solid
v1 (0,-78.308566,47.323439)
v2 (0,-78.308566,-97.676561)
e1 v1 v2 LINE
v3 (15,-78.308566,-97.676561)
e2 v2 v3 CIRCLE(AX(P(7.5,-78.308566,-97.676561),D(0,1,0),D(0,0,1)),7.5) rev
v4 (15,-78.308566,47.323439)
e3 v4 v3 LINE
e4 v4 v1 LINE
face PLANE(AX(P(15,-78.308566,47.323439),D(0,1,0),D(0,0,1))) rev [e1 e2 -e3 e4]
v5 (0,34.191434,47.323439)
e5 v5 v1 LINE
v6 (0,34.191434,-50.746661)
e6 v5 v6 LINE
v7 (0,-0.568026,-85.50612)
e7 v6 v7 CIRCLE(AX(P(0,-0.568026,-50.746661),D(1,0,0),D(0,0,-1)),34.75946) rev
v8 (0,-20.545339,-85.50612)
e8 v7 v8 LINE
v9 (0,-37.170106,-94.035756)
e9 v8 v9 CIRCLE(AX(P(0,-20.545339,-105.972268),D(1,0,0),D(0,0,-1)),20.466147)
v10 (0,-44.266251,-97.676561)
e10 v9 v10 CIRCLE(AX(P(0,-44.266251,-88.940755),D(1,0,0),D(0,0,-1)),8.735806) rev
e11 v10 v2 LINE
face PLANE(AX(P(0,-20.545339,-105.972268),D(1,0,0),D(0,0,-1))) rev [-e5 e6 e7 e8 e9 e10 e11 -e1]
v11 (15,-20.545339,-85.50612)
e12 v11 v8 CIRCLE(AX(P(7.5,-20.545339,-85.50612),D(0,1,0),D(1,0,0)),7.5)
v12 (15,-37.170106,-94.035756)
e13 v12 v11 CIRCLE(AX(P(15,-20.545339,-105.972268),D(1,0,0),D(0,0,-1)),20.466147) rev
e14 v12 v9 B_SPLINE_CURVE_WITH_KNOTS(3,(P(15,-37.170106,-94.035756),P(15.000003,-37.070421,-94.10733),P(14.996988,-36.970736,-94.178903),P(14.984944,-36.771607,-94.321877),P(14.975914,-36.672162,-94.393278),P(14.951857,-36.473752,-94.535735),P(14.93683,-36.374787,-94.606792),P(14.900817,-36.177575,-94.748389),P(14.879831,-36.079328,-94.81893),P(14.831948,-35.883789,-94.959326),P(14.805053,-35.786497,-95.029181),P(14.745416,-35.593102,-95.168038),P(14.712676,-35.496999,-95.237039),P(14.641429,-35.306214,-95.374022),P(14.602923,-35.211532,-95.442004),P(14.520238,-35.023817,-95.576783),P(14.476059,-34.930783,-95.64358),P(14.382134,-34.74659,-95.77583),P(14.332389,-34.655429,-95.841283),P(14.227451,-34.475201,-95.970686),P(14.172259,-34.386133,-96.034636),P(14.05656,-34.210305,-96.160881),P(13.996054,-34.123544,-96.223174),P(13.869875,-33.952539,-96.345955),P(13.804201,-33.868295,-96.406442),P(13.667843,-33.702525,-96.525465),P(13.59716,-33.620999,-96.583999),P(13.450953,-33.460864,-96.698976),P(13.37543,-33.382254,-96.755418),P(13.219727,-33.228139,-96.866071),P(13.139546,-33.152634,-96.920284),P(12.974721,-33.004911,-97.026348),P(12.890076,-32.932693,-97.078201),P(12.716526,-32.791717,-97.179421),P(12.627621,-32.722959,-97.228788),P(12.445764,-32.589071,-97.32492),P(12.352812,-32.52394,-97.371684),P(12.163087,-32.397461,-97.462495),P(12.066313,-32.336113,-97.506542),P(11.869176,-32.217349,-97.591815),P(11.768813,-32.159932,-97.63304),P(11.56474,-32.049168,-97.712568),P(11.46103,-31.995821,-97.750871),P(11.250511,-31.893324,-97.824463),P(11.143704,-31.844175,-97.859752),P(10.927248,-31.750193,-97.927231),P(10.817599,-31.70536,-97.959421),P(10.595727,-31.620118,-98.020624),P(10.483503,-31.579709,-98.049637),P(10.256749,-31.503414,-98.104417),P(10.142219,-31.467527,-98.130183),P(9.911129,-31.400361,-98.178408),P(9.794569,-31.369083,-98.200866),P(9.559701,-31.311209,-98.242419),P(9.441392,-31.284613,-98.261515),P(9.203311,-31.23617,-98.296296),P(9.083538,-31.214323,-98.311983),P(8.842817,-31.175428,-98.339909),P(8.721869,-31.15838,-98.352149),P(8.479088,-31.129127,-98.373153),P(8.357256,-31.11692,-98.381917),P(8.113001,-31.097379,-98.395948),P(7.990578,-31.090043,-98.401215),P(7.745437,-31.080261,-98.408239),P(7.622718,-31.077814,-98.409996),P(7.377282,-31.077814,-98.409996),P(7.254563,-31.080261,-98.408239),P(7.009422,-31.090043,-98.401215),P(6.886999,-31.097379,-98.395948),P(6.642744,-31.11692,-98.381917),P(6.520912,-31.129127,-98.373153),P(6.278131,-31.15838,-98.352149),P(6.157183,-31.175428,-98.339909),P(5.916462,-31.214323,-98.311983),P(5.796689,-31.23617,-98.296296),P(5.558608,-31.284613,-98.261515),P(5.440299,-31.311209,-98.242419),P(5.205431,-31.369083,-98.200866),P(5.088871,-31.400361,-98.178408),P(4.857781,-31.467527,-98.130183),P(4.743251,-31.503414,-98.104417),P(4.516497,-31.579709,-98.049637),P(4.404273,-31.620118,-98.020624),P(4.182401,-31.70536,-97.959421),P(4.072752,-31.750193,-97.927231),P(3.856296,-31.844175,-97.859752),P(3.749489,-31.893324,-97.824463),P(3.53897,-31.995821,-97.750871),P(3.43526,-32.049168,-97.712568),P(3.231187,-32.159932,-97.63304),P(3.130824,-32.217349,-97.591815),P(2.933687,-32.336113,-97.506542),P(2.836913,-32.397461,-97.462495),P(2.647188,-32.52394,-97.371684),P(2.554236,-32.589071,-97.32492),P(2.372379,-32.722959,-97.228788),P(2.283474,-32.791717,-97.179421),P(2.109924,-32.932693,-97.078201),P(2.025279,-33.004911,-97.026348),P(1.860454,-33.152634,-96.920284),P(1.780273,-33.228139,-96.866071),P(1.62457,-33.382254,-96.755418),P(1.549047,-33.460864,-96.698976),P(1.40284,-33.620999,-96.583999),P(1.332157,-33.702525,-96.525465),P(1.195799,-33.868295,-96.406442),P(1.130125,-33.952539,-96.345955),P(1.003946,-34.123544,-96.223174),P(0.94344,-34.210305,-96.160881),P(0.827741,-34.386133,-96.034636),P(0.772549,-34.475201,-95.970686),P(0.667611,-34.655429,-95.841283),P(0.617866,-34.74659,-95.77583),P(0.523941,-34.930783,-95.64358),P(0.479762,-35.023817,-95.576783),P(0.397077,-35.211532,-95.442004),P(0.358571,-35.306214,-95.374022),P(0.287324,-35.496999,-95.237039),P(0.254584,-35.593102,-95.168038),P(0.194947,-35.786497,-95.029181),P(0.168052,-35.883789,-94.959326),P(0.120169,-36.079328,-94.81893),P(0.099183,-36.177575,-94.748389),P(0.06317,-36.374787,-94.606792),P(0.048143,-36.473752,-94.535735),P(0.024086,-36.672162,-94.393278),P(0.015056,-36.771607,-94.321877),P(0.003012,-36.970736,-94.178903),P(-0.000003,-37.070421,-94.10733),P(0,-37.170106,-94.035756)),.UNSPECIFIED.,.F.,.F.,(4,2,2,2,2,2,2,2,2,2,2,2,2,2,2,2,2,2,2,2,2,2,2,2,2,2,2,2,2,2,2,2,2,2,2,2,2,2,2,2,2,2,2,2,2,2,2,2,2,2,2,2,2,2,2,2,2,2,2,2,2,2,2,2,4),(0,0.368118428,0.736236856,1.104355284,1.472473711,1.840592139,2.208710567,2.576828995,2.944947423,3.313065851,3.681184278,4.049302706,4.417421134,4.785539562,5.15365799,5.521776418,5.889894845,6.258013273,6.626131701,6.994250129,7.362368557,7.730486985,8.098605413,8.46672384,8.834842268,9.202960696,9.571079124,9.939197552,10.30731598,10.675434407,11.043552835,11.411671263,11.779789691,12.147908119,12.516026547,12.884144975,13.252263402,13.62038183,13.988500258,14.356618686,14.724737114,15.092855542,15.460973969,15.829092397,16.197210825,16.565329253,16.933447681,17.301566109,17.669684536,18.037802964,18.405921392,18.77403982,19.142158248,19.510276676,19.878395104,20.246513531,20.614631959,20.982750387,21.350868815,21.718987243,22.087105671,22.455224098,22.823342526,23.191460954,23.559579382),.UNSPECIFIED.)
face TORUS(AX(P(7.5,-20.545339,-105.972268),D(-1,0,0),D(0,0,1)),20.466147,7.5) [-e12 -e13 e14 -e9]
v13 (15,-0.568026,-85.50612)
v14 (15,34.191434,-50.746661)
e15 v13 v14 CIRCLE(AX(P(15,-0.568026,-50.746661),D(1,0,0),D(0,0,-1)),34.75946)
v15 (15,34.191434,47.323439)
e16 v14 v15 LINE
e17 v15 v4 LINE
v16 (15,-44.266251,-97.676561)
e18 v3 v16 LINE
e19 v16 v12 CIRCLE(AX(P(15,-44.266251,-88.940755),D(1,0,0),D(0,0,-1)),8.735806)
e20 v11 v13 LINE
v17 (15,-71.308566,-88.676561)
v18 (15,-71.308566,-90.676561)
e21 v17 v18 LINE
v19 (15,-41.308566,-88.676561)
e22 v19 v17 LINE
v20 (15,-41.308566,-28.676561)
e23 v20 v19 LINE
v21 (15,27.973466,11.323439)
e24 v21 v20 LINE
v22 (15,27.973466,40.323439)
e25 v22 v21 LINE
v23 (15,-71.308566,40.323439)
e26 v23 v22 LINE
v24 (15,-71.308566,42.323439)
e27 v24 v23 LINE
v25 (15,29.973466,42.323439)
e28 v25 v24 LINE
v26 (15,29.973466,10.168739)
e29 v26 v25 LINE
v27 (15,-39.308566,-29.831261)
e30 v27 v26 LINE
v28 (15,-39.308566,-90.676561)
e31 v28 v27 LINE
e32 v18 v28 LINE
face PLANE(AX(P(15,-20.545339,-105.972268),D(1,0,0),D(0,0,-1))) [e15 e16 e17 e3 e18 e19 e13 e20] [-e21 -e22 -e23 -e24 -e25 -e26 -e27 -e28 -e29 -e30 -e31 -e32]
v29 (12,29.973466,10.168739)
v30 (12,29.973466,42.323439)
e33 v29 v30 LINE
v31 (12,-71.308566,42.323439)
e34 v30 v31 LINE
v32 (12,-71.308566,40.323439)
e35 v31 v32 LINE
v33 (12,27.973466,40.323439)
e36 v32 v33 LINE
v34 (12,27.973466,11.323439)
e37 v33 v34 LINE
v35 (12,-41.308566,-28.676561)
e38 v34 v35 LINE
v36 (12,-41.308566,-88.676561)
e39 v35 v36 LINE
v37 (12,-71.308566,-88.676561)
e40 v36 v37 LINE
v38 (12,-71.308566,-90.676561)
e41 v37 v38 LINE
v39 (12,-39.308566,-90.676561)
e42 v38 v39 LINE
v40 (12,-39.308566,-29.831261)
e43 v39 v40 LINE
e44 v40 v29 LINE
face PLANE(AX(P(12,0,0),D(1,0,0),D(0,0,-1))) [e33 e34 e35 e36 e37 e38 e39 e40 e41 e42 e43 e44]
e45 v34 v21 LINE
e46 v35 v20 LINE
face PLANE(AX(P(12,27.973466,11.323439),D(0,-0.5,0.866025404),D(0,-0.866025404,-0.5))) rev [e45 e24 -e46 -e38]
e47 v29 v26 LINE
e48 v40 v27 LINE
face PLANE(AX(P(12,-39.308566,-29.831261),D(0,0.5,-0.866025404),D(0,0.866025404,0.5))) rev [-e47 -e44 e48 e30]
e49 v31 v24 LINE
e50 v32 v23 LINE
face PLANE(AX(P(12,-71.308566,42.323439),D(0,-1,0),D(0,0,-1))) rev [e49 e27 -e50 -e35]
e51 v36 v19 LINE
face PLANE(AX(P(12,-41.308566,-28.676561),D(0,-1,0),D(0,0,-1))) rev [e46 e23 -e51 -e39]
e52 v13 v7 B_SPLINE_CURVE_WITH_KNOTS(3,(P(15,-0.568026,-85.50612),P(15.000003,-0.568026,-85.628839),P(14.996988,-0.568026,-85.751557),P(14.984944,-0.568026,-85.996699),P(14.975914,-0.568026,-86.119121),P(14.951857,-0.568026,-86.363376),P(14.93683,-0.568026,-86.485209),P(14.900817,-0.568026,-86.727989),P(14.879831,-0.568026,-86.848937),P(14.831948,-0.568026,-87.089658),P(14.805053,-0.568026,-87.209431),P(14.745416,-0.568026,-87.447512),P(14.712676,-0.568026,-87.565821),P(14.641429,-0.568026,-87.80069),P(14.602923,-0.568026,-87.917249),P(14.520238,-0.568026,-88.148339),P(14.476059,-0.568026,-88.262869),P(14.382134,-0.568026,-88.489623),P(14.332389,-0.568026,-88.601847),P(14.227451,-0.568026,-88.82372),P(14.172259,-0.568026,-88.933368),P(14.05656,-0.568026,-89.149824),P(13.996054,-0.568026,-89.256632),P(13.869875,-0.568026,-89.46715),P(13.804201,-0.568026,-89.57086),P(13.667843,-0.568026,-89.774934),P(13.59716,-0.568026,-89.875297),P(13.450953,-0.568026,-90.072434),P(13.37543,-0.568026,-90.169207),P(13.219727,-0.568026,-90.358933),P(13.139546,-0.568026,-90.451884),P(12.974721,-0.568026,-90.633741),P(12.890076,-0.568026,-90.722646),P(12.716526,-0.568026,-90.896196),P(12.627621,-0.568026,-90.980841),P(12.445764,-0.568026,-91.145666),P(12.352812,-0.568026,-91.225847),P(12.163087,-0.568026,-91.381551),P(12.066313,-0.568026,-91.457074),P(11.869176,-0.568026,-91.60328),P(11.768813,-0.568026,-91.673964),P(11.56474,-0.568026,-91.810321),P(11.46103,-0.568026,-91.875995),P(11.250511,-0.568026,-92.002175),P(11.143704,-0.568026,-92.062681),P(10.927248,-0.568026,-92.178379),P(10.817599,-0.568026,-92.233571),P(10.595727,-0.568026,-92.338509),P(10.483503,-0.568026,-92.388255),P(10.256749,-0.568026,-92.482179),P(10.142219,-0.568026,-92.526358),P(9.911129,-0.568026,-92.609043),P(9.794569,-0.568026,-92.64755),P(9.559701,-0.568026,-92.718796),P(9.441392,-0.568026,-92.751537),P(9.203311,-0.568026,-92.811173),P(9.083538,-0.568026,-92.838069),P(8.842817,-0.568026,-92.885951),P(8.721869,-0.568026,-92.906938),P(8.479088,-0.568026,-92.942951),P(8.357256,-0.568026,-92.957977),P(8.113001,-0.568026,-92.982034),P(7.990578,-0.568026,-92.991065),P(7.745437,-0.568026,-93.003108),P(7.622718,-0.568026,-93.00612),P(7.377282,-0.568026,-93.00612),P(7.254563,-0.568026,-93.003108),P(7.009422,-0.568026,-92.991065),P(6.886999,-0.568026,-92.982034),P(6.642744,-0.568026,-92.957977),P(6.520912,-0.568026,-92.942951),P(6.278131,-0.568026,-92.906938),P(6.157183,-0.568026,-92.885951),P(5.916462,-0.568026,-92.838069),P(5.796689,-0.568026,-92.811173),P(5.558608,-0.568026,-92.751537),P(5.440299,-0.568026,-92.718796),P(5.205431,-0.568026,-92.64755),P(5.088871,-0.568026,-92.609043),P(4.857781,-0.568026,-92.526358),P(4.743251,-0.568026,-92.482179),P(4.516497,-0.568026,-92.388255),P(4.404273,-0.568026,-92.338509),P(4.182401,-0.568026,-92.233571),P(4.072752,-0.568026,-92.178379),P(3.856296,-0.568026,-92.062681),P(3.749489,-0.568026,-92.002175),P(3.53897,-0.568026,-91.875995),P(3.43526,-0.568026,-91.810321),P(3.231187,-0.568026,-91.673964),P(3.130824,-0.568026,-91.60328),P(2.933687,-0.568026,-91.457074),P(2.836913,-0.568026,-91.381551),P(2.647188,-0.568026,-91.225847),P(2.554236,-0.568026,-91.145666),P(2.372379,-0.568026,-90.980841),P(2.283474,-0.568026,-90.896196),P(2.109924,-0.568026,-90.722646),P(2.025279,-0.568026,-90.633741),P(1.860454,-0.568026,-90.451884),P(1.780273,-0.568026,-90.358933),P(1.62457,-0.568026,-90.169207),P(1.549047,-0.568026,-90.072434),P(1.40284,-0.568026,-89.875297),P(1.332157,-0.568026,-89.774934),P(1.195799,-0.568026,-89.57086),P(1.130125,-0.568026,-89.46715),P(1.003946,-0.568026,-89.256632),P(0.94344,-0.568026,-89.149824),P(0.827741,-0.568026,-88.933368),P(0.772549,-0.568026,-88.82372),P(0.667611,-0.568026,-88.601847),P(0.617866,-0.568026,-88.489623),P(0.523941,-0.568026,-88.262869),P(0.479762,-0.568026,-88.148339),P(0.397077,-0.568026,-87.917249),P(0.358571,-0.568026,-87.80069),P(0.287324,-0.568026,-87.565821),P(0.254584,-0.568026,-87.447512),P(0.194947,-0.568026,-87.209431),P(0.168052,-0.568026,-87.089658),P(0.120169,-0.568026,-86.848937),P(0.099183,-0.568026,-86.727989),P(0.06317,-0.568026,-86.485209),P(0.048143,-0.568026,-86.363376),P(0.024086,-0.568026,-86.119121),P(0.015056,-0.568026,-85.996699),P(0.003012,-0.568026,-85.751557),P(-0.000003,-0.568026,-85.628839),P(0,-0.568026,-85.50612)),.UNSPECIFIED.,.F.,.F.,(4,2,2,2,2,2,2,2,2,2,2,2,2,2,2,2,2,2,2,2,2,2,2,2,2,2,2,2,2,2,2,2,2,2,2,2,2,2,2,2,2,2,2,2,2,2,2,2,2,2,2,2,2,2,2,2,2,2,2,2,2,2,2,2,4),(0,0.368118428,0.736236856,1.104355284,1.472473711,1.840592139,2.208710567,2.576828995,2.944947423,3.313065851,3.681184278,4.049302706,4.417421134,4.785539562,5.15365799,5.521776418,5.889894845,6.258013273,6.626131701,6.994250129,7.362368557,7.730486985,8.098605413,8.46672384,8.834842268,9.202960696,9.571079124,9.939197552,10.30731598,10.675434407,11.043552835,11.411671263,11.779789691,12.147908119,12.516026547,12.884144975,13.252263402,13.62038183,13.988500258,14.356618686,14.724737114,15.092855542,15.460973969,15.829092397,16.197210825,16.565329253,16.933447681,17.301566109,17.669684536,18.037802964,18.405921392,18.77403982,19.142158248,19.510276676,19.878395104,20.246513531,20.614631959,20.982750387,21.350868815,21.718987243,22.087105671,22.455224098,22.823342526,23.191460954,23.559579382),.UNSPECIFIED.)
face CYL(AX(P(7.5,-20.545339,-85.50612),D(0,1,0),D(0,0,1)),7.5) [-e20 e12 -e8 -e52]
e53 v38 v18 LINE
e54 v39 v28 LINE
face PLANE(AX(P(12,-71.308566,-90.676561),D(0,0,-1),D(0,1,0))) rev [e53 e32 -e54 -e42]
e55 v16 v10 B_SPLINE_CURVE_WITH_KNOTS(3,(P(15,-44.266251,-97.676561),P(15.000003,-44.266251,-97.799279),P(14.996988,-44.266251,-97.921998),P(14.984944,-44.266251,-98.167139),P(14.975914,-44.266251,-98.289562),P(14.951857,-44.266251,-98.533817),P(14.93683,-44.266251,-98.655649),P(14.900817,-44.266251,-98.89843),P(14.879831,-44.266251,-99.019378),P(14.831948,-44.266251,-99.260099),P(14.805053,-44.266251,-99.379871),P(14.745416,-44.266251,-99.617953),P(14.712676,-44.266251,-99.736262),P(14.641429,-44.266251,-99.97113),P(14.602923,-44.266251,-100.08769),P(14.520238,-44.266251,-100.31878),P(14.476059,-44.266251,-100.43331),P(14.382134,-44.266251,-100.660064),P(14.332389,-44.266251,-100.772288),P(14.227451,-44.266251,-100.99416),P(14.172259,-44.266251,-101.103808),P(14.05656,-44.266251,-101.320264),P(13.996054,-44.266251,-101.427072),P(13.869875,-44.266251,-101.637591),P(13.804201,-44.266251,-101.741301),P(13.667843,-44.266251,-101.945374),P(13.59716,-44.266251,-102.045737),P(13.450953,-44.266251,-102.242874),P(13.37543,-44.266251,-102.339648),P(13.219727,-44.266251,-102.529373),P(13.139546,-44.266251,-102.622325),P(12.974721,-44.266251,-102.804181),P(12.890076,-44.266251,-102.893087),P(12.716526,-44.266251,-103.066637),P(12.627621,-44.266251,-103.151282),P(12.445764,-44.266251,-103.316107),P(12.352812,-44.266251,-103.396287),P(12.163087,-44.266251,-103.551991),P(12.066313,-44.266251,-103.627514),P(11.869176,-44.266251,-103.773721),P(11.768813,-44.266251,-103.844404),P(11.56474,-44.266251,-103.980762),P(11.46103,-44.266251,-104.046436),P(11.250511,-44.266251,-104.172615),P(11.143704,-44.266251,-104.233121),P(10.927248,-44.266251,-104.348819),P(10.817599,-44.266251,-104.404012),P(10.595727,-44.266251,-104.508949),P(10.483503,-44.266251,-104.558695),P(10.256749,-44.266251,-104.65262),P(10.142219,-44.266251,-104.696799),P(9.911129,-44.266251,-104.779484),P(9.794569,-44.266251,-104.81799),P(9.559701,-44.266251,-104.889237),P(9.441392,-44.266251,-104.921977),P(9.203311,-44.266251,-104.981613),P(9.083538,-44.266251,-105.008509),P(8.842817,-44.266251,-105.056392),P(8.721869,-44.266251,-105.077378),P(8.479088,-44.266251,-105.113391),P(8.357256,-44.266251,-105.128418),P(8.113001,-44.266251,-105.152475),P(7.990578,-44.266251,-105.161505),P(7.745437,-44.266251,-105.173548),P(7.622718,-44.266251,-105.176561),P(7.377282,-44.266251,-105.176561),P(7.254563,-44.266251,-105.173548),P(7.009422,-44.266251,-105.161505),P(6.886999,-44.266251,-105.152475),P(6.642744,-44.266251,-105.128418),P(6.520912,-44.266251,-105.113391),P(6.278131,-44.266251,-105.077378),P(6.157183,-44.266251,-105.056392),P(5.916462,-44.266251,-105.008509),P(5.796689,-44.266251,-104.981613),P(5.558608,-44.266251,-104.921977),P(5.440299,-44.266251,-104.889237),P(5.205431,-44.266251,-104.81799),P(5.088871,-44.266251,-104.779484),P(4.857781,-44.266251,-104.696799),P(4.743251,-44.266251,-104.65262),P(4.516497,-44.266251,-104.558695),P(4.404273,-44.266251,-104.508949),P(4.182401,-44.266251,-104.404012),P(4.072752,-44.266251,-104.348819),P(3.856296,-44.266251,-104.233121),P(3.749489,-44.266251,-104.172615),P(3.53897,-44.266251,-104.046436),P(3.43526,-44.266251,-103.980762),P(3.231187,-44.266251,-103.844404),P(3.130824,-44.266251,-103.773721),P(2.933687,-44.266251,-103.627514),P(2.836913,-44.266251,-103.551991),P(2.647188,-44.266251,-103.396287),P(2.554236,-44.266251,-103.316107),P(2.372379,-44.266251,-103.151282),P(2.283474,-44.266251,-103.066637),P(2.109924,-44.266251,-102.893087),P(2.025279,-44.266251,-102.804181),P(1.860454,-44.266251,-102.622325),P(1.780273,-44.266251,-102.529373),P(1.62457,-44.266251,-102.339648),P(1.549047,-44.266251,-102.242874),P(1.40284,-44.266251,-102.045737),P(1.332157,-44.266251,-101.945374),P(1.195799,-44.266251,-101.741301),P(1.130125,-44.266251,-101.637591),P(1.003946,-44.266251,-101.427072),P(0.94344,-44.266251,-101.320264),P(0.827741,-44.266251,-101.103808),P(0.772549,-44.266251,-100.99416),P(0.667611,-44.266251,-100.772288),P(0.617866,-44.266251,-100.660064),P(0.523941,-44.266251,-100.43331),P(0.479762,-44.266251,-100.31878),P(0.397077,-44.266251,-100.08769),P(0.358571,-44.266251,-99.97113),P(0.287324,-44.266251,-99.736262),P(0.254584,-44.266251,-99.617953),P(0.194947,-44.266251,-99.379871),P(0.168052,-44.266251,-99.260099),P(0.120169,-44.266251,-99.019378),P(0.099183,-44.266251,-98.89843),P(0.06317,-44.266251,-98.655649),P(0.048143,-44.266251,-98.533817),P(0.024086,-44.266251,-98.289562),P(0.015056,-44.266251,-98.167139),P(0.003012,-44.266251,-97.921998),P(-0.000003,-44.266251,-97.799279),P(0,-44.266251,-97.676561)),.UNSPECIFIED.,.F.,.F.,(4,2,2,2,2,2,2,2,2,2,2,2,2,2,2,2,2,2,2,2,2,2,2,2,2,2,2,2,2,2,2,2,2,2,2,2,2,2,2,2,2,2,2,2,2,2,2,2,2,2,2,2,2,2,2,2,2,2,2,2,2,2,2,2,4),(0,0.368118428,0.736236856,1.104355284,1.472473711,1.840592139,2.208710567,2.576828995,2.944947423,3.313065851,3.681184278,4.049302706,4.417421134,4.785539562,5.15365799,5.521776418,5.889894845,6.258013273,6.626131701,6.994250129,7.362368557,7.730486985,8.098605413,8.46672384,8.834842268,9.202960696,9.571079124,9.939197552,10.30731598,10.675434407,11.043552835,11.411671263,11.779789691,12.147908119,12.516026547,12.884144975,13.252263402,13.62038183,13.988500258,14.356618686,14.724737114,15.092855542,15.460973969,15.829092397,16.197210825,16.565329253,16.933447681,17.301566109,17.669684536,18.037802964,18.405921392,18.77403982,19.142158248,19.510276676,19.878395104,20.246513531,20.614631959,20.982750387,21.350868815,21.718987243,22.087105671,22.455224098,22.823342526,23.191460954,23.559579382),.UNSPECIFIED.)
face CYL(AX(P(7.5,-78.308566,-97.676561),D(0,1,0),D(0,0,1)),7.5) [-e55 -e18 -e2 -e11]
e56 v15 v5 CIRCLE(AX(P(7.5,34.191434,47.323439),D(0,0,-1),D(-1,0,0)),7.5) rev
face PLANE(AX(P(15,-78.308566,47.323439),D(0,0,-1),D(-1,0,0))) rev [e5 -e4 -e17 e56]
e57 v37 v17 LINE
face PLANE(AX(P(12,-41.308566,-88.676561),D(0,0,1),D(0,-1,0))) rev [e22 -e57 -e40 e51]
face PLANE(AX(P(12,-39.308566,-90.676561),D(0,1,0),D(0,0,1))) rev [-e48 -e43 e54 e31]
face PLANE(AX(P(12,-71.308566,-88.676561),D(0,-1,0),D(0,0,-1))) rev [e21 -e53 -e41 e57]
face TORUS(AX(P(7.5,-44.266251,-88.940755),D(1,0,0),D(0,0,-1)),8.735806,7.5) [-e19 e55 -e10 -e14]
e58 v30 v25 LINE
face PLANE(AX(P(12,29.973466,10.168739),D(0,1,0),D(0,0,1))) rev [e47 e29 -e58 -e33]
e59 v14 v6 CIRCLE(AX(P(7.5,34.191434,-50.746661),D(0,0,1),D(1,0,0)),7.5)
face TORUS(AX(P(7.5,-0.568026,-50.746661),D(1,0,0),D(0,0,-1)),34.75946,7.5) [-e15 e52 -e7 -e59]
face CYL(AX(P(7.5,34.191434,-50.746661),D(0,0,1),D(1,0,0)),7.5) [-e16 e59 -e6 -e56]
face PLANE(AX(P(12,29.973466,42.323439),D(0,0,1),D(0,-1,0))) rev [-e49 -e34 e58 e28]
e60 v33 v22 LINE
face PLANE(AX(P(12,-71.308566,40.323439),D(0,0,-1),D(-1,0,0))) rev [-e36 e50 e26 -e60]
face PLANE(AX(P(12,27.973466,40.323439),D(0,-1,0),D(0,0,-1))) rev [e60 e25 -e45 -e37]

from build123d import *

# Parameters (mm, degrees)
BOSS_EXTRUDE1_DEPTH = 15
CUT_EXTRUDE4_DEPTH  = 3
FILLET1_R           = 7.5


with BuildPart() as part:
    # Sketch1 → Boss-Extrude1 (new body)
    with BuildSketch(Plane(origin=(0, 0, 0), x_dir=(0, 0, -1), z_dir=(1, 0, 0))):
        with BuildLine():
            Line((105.176560834, -44.266250702), (105.176560834, -78.308566478))
            Line((105.176560834, -78.308566478), (-47.323439166, -78.308566478))
            Line((-47.323439166, -78.308566478), (-47.323439166, 41.691433522))
            Line((-47.323439166, 41.691433522), (50.746660587, 41.691433522))
            ThreePointArc((50.746660587, 41.691433522), (80.628611175, 29.313924319), (93.006120378, -0.568026269))
            Line((93.006120378, -0.568026269), (93.006120378, -20.545339005))
            ThreePointArc((93.006120378, -20.545339005), (94.435922822, -26.464268202), (98.409995921, -31.077813571))
            ThreePointArc((98.409995921, -31.077813571), (103.386206676, -36.854751618), (105.176560834, -44.266250702))
        make_face()
    extrude(amount=BOSS_EXTRUDE1_DEPTH)

    # Sketch3 → Cut-Extrude4 (cut)
    with BuildSketch(Plane(origin=(15, 0, 0), x_dir=(0, 0, -1), z_dir=(1, 0, 0))):
        Polygon((90.676560834, -71.308566478), (90.676560834, -39.308566478), (29.831261372, -39.308566478), (-10.168738628, 29.973465825), (-42.323439166, 29.973465825), (-42.323439166, -71.308566478), (-40.323439166, -71.308566478), (-40.323439166, 27.973465825), (-11.323439166, 27.973465825), (28.676560834, -41.308566478), (88.676560834, -41.308566478), (88.676560834, -71.308566478), align=None)
    extrude(amount=-CUT_EXTRUDE4_DEPTH, mode=Mode.SUBTRACT)

    # Fillet1
    fillet1_edges = [part.edges().sort_by_distance(p)[0] for p in [
        (15, 29.313924319, -80.628611175),
        (0, -10.556682637, -93.006120378),
        (0, -26.464268202, -94.435922822),
        (15, 41.691433522, -1.711610711),
        (15, -61.28740859, -105.176560834),
        (15, -36.854751618, -103.386206676),
        (15, -10.556682637, -93.006120378),
        (0, -61.28740859, -105.176560834),
        (0, 41.691433522, -1.711610711),
    ]]
    fillet(fillet1_edges, radius=FILLET1_R - 0.0001)  # a hair under: the kernel refuses the full size


solid = part.part
